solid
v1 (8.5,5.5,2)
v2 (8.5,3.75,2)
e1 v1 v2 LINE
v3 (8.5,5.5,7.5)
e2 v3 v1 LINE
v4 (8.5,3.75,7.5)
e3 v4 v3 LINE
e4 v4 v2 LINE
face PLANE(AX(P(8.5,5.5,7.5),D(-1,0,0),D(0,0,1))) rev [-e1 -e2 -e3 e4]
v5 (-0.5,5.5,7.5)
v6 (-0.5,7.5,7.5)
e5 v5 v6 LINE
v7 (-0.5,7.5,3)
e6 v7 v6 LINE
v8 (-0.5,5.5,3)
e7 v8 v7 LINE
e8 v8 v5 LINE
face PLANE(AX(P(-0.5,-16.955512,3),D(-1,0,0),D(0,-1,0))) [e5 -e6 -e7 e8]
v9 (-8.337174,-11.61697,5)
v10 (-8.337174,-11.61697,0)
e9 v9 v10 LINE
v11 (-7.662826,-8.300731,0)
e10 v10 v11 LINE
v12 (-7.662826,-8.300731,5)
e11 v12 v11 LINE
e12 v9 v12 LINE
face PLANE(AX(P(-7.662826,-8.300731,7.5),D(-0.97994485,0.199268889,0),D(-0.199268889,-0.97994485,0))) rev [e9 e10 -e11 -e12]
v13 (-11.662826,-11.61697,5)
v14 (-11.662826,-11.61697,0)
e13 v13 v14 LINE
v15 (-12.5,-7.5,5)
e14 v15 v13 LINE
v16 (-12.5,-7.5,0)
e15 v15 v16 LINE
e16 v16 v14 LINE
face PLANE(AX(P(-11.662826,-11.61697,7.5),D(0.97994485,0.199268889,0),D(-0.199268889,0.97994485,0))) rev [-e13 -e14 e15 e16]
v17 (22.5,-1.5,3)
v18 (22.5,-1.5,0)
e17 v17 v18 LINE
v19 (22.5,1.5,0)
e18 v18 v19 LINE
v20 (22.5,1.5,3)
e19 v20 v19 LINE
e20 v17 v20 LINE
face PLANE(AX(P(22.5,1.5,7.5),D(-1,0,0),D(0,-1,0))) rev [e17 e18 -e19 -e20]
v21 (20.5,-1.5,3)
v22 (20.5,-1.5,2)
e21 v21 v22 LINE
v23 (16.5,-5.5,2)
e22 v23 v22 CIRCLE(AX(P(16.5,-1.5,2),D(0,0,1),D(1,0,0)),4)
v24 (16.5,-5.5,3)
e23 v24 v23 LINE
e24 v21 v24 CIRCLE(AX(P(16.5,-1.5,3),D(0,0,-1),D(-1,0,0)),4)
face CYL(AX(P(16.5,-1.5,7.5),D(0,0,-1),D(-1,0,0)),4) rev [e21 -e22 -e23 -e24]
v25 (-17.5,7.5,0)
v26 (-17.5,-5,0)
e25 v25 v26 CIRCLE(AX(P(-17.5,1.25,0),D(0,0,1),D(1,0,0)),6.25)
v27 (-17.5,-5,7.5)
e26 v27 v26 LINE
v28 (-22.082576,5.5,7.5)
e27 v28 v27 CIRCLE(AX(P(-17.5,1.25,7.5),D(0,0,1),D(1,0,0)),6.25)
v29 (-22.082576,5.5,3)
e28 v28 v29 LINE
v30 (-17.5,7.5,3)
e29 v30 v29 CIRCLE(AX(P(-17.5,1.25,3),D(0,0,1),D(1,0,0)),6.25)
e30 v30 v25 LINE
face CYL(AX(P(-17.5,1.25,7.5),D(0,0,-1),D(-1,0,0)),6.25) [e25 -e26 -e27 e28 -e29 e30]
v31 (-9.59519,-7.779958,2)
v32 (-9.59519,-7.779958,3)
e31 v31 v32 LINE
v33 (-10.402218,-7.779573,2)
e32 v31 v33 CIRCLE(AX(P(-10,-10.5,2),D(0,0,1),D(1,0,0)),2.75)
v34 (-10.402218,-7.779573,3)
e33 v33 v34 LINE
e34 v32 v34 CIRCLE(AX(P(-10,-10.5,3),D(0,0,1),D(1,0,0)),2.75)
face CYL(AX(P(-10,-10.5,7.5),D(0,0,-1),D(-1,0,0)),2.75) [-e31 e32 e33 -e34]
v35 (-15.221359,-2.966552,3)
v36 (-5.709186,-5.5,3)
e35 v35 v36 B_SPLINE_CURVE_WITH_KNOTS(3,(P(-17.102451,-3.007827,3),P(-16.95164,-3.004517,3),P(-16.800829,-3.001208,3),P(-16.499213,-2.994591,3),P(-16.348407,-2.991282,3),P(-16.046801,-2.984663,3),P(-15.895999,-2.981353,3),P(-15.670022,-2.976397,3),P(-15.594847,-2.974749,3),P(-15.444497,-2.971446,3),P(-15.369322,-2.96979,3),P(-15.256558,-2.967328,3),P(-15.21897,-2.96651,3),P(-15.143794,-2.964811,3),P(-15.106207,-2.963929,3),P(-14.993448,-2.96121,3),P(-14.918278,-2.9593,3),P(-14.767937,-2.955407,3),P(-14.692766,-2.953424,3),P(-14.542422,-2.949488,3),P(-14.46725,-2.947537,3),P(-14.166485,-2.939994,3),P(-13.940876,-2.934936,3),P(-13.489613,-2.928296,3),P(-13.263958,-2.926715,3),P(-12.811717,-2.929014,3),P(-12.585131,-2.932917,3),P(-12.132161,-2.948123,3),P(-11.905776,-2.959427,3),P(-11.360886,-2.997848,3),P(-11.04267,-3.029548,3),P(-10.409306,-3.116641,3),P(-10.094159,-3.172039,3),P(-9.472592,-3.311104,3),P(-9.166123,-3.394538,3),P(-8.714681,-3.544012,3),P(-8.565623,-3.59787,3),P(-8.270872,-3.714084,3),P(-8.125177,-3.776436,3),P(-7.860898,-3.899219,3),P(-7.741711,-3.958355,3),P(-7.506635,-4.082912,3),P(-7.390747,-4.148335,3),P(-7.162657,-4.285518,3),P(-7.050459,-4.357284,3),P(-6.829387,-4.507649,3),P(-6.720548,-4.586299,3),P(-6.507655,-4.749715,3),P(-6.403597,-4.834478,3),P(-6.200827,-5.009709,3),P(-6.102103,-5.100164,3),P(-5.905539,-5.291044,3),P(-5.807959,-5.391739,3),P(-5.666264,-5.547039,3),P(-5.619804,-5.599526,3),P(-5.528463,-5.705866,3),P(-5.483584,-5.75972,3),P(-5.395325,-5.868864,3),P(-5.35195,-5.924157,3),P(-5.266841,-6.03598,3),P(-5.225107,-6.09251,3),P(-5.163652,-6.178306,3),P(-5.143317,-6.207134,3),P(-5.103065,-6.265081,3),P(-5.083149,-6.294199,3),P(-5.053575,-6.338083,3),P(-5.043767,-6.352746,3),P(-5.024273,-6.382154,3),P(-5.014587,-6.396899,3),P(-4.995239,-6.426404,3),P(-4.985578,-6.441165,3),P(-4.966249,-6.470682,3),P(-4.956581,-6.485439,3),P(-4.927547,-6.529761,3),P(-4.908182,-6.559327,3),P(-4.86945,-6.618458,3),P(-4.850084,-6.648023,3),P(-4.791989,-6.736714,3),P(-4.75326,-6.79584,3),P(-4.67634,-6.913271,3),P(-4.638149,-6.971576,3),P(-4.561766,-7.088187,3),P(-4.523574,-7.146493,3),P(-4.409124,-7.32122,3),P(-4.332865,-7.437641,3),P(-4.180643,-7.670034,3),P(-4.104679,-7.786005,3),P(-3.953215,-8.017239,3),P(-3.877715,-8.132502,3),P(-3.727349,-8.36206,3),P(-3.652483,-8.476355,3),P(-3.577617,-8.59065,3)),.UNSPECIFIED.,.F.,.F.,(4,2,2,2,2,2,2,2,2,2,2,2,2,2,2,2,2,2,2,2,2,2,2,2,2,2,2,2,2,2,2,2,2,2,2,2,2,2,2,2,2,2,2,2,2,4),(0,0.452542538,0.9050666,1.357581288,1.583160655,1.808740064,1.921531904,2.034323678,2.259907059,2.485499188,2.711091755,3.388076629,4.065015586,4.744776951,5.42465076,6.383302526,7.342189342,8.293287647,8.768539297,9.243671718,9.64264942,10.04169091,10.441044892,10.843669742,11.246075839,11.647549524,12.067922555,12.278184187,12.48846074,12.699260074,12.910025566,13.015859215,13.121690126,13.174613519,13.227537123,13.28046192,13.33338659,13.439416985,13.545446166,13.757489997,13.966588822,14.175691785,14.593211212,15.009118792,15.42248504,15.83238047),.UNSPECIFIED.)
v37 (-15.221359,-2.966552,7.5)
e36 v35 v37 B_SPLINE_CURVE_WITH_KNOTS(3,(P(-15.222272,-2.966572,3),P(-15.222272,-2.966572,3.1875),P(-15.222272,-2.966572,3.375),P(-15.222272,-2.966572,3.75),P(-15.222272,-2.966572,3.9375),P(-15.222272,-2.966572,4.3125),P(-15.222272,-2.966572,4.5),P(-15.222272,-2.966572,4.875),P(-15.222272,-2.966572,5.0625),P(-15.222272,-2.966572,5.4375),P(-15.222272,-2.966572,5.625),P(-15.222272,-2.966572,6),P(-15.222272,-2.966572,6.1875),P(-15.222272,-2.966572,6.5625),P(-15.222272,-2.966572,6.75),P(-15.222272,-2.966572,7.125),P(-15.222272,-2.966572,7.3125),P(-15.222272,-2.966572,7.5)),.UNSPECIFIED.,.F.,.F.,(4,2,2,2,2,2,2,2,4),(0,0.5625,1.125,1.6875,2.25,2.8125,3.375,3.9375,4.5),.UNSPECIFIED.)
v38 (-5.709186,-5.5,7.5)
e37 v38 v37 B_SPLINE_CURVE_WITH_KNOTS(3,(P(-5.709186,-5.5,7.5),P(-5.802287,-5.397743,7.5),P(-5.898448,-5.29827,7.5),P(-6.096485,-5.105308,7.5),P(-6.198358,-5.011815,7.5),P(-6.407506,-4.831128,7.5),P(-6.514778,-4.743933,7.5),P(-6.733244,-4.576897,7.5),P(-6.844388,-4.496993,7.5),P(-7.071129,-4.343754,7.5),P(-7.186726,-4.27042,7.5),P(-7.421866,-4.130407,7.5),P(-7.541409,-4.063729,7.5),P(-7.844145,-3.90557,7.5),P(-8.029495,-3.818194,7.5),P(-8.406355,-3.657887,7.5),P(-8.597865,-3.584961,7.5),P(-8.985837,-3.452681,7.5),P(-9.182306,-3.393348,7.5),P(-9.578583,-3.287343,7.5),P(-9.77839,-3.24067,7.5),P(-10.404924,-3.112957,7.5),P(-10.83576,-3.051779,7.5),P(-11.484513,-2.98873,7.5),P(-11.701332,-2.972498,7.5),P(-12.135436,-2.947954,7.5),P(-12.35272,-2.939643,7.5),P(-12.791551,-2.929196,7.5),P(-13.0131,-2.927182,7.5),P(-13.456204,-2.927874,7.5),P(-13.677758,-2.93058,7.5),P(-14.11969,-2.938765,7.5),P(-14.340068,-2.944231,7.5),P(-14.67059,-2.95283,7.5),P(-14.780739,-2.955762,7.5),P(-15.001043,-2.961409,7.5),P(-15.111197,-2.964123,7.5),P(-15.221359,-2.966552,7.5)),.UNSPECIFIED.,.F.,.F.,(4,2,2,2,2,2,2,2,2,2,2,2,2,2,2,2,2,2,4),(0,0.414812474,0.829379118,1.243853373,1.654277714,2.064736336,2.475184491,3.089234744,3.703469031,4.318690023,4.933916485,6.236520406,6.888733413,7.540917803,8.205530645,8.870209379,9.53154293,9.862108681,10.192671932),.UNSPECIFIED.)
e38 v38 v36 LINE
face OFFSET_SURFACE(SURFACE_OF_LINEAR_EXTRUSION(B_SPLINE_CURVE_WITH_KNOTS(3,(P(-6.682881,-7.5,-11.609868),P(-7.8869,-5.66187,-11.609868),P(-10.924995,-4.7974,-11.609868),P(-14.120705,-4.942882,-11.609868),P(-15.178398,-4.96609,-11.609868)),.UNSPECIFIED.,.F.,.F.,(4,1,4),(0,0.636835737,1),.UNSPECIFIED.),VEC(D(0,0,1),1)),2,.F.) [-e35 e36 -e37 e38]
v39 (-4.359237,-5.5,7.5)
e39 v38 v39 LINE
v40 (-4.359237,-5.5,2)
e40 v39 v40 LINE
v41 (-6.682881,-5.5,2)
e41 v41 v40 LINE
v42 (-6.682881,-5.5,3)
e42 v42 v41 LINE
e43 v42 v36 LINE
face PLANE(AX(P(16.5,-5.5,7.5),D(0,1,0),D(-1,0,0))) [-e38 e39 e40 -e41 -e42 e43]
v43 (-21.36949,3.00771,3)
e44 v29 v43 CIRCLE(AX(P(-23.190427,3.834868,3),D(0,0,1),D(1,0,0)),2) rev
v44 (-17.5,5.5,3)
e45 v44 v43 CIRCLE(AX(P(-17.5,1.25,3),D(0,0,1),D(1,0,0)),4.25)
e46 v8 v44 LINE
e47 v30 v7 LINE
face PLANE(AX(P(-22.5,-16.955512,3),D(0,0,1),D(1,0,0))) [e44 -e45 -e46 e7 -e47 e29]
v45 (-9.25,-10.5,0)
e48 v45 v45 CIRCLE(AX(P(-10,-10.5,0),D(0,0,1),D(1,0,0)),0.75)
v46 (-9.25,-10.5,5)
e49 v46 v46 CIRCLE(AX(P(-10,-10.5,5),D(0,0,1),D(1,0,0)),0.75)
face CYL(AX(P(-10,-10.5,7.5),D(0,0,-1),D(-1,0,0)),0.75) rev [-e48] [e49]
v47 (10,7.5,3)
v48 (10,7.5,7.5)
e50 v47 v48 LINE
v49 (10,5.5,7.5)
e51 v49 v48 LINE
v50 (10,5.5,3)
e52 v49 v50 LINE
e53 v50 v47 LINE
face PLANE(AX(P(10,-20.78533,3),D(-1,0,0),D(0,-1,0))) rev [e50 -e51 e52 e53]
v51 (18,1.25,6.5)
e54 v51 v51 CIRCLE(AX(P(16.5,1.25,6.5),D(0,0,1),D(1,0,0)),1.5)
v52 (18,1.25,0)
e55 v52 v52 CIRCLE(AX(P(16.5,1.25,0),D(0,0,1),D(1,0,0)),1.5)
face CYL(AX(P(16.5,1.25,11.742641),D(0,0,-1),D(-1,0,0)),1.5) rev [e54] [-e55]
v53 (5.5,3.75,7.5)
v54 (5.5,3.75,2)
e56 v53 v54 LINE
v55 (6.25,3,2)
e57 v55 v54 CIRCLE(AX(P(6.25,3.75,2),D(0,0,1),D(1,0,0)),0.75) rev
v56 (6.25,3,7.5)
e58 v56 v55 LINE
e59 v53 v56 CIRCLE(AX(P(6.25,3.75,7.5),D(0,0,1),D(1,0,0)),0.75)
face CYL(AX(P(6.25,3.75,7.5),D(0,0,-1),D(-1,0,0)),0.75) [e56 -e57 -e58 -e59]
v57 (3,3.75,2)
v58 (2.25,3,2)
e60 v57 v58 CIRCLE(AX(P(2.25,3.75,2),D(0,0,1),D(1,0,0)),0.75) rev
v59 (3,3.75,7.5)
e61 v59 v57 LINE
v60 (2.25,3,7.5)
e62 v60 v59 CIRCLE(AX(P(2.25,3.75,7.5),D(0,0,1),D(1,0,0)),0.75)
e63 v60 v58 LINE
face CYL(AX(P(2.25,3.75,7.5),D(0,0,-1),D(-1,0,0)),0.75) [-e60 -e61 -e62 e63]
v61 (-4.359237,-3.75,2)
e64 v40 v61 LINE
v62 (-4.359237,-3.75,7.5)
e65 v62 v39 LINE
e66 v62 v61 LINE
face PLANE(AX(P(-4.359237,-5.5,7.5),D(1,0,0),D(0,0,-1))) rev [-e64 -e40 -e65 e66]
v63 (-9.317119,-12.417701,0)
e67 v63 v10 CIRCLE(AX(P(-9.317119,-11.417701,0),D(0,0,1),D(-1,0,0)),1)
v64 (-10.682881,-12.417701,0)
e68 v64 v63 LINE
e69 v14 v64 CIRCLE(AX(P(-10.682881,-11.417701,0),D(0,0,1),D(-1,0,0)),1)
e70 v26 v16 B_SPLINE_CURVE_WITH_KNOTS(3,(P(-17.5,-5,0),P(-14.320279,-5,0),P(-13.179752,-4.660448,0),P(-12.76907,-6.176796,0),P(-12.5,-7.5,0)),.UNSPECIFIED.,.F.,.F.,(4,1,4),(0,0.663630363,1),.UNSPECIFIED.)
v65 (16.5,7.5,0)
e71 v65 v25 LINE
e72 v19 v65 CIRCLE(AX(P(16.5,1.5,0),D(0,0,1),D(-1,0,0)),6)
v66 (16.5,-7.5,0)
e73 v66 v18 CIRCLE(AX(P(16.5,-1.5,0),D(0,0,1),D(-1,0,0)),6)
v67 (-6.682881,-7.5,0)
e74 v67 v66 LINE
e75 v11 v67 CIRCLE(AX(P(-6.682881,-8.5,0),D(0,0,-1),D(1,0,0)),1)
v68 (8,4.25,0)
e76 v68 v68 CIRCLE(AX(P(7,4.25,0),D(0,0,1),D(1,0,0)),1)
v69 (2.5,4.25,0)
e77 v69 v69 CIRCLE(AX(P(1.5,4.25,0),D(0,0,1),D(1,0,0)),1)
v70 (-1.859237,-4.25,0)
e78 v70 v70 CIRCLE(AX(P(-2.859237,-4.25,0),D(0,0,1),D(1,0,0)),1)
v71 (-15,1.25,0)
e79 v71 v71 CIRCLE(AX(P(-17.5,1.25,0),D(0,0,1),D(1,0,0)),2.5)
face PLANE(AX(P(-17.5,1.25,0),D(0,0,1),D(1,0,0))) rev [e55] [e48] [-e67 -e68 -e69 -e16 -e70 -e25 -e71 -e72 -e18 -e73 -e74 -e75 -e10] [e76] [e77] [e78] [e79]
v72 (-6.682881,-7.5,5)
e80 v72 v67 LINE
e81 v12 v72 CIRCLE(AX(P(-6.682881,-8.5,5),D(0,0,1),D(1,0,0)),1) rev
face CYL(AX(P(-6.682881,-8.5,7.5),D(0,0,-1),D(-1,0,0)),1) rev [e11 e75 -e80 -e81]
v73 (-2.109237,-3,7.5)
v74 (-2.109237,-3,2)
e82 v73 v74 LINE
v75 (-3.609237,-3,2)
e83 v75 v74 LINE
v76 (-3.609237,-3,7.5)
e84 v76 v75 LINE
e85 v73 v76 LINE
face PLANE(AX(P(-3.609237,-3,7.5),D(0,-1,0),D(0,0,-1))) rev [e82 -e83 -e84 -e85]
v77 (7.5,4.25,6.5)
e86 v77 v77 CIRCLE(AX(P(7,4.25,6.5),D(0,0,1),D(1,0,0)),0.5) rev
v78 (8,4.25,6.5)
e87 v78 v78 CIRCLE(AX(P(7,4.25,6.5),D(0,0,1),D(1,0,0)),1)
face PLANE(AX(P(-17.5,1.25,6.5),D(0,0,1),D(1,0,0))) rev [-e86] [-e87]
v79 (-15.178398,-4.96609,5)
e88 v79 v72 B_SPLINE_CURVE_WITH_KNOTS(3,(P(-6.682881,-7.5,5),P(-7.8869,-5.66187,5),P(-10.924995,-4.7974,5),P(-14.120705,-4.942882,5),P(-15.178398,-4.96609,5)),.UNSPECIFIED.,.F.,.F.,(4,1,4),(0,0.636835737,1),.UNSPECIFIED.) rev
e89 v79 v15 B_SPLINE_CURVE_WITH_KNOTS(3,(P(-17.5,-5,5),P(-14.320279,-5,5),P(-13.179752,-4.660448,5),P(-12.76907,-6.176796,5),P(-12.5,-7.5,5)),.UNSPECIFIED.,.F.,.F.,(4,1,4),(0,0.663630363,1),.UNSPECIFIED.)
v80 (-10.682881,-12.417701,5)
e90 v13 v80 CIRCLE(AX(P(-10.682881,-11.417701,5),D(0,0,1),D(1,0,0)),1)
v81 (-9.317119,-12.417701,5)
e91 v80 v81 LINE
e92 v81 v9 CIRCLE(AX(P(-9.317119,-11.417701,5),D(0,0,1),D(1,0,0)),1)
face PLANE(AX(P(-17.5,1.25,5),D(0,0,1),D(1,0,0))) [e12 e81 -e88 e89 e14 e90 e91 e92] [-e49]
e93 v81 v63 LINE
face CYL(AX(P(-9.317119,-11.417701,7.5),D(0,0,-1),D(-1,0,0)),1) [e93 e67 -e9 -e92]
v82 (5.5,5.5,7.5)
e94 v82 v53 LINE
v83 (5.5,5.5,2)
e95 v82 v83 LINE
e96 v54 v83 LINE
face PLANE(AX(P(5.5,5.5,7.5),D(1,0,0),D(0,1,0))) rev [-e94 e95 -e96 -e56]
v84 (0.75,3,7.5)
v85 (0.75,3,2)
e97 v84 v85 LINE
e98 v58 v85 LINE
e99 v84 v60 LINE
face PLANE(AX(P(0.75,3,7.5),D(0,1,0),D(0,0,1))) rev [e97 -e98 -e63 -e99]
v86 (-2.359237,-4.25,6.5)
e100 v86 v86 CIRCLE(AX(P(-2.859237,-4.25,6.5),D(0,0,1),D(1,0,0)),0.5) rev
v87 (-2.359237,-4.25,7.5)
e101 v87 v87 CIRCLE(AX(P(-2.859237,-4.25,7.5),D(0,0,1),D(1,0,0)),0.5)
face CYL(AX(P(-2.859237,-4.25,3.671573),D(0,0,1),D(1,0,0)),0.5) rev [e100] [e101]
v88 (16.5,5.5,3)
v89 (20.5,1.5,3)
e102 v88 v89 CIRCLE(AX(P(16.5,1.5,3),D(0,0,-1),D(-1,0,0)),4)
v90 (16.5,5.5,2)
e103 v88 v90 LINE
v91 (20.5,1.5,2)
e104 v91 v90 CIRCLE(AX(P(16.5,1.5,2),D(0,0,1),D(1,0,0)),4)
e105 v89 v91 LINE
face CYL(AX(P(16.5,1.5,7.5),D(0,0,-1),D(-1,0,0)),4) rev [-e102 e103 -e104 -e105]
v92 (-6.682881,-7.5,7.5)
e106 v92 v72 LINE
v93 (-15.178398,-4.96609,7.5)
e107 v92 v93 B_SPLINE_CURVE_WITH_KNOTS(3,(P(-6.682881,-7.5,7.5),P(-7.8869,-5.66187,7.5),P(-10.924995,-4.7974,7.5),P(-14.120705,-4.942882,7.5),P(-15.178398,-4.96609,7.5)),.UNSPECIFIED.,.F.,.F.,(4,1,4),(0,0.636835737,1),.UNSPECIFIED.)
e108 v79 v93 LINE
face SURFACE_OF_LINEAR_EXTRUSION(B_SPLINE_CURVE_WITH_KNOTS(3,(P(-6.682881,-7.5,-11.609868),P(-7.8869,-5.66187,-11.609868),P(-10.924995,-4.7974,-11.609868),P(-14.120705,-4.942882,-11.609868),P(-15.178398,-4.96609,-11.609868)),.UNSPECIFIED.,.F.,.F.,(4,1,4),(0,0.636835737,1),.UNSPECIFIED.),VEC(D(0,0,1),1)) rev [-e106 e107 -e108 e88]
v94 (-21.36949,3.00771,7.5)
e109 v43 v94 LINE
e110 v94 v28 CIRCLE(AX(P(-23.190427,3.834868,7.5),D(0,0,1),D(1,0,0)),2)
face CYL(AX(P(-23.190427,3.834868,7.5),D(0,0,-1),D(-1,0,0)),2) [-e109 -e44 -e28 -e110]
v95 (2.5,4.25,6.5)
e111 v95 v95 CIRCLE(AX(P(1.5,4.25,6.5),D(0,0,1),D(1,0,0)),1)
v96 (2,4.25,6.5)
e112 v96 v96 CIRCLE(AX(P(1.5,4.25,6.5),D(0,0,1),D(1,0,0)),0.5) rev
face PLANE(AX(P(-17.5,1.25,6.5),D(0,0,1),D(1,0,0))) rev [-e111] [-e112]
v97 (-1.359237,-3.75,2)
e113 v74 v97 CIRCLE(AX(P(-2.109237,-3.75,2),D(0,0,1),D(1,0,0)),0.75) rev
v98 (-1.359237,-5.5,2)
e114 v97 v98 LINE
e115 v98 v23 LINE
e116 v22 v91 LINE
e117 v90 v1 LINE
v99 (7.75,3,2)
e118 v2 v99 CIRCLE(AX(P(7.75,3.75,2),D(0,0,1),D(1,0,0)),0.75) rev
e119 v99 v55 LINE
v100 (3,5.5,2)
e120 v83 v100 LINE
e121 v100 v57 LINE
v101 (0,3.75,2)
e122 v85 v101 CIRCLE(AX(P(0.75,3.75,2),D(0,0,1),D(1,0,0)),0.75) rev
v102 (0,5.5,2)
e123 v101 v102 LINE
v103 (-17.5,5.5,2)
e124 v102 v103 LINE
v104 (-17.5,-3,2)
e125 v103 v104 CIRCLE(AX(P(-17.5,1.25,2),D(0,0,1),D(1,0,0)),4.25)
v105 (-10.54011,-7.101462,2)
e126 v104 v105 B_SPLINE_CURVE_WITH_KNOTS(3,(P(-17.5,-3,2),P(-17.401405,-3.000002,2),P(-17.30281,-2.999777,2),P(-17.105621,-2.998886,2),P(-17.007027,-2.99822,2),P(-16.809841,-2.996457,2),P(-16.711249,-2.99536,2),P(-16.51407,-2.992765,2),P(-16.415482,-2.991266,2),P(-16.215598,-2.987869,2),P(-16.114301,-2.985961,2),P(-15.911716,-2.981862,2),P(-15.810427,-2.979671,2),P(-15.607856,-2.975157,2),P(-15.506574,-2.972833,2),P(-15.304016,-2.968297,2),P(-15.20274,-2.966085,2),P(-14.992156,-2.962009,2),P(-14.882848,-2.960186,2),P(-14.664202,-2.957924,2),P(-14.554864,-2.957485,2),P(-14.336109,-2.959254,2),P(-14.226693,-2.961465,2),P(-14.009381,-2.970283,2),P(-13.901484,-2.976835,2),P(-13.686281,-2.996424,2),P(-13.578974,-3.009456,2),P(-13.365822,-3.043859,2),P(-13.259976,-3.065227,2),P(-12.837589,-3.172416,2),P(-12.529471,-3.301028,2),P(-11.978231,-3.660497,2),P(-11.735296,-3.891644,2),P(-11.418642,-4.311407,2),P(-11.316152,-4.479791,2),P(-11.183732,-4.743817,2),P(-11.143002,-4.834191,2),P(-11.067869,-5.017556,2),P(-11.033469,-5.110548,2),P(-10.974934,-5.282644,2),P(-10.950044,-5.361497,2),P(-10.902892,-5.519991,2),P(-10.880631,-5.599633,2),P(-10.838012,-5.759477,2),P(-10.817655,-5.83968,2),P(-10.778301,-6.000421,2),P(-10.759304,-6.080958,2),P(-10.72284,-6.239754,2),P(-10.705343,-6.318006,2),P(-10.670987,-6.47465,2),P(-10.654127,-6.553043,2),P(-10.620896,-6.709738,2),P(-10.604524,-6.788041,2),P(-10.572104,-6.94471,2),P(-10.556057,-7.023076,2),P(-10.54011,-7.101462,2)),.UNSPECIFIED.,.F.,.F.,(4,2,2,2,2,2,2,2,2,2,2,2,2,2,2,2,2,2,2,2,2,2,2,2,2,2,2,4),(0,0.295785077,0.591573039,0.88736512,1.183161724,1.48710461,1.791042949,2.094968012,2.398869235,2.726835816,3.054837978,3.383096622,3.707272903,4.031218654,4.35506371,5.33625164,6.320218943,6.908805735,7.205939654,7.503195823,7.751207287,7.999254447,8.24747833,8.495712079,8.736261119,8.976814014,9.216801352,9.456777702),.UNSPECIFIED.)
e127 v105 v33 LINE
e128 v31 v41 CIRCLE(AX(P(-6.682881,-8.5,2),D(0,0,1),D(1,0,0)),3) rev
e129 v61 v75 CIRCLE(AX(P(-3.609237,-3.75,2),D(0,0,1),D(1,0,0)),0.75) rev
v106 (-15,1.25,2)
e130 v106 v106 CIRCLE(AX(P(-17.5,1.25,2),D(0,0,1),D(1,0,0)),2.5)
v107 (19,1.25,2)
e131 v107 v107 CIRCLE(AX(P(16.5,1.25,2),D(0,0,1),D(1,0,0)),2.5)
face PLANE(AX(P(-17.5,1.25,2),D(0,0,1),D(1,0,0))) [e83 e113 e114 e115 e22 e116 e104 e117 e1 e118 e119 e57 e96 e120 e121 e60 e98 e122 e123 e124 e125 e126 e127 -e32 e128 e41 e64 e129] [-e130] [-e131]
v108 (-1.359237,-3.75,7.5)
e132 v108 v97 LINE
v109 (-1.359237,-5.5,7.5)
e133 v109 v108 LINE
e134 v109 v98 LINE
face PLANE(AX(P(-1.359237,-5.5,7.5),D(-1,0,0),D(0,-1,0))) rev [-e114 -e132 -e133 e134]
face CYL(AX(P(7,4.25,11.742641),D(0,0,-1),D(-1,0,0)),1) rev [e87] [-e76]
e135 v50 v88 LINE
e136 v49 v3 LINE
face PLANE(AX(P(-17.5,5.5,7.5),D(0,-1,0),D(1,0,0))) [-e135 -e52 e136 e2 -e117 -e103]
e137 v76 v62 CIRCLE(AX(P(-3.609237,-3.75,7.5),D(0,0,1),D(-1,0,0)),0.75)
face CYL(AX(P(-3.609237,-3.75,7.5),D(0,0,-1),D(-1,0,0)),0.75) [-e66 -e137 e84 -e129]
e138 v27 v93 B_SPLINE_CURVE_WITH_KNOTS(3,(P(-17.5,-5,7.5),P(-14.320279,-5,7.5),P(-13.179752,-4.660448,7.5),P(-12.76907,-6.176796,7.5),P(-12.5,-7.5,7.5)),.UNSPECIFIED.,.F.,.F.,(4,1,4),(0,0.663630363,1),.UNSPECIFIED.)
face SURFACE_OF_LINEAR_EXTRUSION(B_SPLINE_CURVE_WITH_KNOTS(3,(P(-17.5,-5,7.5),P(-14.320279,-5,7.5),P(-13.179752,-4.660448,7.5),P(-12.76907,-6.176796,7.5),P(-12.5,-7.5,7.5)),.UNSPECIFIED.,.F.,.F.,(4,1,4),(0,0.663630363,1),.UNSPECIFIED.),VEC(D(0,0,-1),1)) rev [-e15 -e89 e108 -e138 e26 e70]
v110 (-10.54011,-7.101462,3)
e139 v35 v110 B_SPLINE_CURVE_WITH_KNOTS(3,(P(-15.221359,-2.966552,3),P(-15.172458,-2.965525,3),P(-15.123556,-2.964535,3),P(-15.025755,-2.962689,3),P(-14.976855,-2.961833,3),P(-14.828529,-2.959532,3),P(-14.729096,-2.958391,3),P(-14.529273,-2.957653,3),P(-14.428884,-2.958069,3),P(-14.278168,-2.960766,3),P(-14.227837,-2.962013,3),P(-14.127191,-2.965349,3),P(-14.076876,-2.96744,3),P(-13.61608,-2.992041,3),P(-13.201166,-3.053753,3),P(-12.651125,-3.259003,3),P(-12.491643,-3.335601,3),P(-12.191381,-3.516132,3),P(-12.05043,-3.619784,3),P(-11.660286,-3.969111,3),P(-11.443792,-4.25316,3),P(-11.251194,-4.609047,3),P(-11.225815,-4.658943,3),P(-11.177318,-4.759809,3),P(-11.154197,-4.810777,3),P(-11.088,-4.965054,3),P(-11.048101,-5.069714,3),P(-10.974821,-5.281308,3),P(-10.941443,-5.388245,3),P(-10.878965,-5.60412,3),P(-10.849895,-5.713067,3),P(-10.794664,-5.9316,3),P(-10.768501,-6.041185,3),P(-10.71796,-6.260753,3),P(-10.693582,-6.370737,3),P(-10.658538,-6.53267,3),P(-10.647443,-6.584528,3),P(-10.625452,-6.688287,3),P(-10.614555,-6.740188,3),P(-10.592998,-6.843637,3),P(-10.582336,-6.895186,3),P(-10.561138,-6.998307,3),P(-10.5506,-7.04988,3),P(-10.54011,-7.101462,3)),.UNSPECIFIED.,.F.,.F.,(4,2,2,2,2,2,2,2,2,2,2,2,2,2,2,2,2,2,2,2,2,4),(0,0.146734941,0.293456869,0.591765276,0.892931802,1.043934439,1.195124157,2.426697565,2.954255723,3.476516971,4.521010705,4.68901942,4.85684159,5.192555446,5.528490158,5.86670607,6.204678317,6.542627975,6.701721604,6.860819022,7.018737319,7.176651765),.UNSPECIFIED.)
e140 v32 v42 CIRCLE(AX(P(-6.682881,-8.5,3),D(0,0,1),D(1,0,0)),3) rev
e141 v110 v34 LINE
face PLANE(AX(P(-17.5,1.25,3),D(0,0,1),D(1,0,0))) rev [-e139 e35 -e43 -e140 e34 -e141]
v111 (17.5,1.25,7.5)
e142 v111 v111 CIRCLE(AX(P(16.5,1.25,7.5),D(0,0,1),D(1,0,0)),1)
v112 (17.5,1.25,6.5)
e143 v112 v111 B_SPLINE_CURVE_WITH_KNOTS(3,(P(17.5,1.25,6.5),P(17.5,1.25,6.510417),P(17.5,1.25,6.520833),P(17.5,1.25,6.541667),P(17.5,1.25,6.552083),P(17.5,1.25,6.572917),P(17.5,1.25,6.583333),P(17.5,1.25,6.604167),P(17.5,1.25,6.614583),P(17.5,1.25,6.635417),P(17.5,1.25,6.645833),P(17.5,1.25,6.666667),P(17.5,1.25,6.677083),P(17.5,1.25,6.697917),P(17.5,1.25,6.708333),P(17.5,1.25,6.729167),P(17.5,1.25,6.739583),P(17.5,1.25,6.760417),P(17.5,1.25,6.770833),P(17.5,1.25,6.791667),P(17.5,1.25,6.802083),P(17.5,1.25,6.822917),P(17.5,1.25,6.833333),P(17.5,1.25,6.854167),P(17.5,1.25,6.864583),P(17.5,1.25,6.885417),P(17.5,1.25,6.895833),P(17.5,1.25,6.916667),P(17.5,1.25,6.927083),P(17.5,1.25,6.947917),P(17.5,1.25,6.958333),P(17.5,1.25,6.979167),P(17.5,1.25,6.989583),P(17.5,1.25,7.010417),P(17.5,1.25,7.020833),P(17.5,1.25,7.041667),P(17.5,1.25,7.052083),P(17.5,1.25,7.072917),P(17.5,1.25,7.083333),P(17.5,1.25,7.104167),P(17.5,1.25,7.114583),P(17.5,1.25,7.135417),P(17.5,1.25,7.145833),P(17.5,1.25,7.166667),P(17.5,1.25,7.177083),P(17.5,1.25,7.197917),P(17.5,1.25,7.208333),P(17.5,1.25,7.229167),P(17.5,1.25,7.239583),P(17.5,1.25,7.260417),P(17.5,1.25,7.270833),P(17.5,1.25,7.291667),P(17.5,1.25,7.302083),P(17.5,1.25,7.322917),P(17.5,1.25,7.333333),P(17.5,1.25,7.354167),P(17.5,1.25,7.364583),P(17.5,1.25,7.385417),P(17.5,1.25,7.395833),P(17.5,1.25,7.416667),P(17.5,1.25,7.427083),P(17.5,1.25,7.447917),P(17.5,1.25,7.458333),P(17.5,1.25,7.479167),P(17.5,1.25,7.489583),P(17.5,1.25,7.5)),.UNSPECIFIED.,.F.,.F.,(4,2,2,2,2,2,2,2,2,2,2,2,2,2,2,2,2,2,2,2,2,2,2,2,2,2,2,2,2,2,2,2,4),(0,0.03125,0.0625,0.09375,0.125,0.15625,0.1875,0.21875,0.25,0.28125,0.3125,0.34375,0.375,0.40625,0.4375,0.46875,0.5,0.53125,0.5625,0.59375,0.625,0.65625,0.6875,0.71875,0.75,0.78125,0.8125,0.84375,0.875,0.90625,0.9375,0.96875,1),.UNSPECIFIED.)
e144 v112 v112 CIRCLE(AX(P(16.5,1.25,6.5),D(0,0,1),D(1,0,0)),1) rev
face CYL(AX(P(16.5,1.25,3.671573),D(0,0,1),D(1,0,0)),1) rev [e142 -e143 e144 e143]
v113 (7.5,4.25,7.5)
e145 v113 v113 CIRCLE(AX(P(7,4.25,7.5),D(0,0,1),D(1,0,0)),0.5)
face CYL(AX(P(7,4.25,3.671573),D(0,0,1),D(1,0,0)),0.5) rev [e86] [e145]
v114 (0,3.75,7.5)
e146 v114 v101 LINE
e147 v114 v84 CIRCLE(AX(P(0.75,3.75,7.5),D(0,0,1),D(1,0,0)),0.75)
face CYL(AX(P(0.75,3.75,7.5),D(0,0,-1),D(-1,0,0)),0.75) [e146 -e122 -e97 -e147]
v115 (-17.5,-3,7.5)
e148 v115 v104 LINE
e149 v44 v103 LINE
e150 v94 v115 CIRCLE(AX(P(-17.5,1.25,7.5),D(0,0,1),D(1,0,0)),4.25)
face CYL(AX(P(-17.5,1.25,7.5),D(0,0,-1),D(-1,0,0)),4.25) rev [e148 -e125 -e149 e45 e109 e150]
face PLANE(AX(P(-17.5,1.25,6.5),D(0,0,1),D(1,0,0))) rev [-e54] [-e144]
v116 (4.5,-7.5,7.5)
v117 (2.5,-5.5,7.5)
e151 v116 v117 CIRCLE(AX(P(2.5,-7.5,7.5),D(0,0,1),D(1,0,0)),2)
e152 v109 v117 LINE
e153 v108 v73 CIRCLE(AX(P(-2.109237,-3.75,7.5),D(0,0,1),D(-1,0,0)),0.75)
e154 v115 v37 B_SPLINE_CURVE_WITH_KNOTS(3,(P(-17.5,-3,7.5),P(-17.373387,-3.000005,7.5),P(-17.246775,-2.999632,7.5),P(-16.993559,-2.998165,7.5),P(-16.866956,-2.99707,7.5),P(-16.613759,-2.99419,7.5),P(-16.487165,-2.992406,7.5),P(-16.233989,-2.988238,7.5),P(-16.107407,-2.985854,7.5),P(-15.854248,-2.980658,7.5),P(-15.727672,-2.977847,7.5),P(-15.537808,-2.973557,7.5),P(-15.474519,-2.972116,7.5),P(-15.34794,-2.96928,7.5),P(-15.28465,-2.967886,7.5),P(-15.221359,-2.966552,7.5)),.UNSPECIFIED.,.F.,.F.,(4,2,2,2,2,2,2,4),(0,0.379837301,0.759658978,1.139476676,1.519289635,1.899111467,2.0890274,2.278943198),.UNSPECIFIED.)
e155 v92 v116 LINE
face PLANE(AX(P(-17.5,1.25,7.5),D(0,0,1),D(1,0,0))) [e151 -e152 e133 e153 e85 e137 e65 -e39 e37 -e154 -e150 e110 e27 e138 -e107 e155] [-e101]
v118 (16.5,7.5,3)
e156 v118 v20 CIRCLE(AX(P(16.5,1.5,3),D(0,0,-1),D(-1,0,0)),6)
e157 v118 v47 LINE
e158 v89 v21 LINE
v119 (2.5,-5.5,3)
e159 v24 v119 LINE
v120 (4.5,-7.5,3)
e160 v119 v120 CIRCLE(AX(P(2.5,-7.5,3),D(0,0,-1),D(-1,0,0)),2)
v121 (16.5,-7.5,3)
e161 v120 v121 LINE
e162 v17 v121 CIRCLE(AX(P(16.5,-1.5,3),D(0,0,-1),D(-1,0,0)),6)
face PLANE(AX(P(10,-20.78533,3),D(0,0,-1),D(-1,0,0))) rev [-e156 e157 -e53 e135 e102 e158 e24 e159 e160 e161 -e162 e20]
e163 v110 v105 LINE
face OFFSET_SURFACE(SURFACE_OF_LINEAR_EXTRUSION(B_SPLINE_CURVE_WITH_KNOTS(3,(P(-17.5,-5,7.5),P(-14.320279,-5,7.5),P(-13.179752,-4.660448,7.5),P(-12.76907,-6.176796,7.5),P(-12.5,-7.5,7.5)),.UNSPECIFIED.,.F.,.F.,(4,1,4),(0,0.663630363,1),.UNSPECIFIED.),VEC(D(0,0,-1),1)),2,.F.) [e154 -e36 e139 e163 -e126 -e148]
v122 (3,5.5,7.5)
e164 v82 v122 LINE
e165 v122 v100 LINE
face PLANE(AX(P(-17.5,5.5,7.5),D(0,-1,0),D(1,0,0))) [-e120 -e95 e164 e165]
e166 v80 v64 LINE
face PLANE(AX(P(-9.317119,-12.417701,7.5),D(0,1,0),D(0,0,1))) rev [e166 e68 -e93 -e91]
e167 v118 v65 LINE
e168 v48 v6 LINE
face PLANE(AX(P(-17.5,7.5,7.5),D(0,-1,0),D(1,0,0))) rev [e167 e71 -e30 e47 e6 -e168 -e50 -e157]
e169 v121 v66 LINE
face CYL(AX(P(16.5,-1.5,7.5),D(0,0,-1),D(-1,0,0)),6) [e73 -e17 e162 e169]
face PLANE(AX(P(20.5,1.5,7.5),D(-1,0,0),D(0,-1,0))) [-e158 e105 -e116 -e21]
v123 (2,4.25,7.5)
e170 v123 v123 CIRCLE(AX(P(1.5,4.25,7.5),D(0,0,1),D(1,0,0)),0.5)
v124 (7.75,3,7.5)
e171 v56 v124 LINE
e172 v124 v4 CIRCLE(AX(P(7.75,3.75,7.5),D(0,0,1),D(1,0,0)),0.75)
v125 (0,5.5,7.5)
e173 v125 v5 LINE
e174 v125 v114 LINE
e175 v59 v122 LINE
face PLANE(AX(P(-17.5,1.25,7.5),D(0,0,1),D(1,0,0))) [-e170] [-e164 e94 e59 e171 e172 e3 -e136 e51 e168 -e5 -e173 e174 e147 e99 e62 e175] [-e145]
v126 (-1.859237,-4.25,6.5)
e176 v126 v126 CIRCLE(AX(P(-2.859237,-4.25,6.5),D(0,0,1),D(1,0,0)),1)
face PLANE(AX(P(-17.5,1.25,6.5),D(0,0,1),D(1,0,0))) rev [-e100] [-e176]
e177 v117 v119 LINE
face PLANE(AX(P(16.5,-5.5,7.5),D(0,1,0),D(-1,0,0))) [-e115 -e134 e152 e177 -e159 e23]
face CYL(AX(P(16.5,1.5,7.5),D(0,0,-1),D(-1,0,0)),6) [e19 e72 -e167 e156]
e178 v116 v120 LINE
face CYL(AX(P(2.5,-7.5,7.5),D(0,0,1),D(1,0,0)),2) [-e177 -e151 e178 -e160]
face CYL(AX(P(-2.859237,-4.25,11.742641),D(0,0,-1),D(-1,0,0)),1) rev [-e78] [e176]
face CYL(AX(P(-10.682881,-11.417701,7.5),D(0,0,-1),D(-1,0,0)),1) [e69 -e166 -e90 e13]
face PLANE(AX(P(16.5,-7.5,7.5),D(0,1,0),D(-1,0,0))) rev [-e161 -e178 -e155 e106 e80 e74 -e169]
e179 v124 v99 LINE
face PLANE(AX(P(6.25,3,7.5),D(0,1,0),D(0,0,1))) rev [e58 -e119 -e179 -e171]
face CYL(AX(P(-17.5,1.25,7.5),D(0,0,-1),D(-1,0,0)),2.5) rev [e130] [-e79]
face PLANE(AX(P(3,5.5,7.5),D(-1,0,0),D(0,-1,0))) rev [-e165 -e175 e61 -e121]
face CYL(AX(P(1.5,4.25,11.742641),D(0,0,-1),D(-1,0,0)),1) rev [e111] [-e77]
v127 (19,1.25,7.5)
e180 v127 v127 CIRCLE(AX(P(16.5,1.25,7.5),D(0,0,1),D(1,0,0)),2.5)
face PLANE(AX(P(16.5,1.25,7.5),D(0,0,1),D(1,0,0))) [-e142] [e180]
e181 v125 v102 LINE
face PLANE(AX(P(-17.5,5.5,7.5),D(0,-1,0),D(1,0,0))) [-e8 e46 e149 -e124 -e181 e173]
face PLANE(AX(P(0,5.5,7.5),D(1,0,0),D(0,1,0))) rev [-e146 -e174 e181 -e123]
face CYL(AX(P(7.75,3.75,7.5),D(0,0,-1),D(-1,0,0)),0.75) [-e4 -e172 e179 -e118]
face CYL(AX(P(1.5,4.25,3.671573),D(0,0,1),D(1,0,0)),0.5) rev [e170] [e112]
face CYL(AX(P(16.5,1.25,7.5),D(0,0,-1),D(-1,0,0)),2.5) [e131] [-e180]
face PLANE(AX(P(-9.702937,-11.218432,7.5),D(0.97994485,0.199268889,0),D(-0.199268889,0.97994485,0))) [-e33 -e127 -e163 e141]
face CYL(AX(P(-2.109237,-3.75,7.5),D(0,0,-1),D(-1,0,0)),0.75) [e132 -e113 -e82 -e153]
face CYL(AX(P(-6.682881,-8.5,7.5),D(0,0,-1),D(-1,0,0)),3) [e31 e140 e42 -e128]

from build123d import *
from OCP.BRepAlgoAPI import BRepAlgoAPI_Cut
from OCP.TopTools import TopTools_ListOfShape

# Parameters (mm, degrees)
SKETCH1_R           = 0.75
SKETCH1_R_2         = 2.5
BOSS_EXTRUDE1_DEPTH = 7.5
CUT_EXTRUDE1_DEPTH  = 2.5
SHELL5_START        = 2
SHELL5_OUTLINE_R    = 2.5
SHELL5_DEPTH        = 5.5
SHELL5_2_DEPTH      = 1
CUT_EXTRUDE2_REACH  = 33.891
SKETCH3_W           = 12.5
SKETCH3_H           = 4.5
SKETCH4_W           = 22
SKETCH4_H           = 4.5
CUT_EXTRUDE3_DEPTH  = 2
SKETCH5_R           = 2.5
BOSS_EXTRUDE2_DEPTH = 7.5
SKETCH6_W           = 5.5
SKETCH6_H           = 4.5
CUT_EXTRUDE4_DEPTH  = 2
BOSS_EXTRUDE3_DEPTH = 7.5
SKETCH8_R           = 1
SKETCH8_R_2         = 1.5
CUT_EXTRUDE5_DEPTH  = 6.5
SKETCH9_R           = 1
SKETCH9_R_2         = 0.5
CUT_EXTRUDE6_DEPTH  = 1
FILLET1_R           = 2


with BuildPart() as part:
    # Sketch1 → Boss-Extrude1 (new body)
    with BuildSketch(Plane.XY):
        with BuildLine():
            Line((-17.5, 7.5), (16.5, 7.5))
            ThreePointArc((16.5, 7.5), (20.742640687, 5.742640687), (22.5, 1.5))
            Line((22.5, 1.5), (22.5, -1.5))
            ThreePointArc((22.5, -1.5), (20.742640687, -5.742640687), (16.5, -7.5))
            Line((16.5, -7.5), (-6.682881455, -7.5))
            ThreePointArc((-6.682881455, -7.5), (-7.315625918, -7.725639332), (-7.662826305, -8.300731111))
            Line((-7.662826305, -8.300731111), (-8.337173695, -11.61697006))
            ThreePointArc((-8.337173695, -11.61697006), (-8.684374082, -12.192061839), (-9.317118545, -12.41770117))
            Line((-9.317118545, -12.41770117), (-10.682881455, -12.41770117))
            ThreePointArc((-10.682881455, -12.41770117), (-11.315625918, -12.192061839), (-11.662826305, -11.61697006))
            Line((-11.662826305, -11.61697006), (-12.5, -7.5))
            add(Edge.make_bspline(
                [(-17.5, -5), (-14.320279304, -5), (-13.179751961, -4.660447797), (-12.769069707, -6.176795589), (-12.5, -7.5)],
                knots=[0, 0, 0, 0, 0.663630363, 1, 1, 1, 1], degree=3))
            ThreePointArc((-17.5, -5), (-23.75, 1.25), (-17.5, 7.5))
        make_face()
        with Locations((-10, -10.5)):
            Circle(SKETCH1_R, mode=Mode.SUBTRACT)
        with Locations((-17.5, 1.25)):
            Circle(SKETCH1_R_2, mode=Mode.SUBTRACT)
        with Locations((16.5, 1.25)):
            Circle(SKETCH1_R_2, mode=Mode.SUBTRACT)
    extrude(amount=BOSS_EXTRUDE1_DEPTH)

    # Sketch2 → Cut-Extrude1 (cut)
    with BuildSketch(Plane.XY.offset(7.5)):
        with BuildLine():
            Line((-15.178398269, -4.966090348), (-15.008472623, -12.710378991))
            Line((-15.008472623, -12.710378991), (-6.851113055, -12.710378991))
            Line((-6.851113055, -12.710378991), (-6.682881455, -7.5))
            add(Edge.make_bspline(
                [(-15.178398269, -4.966090348), (-14.120705321, -4.942882386), (-10.924994513, -4.797400334), (-7.886900282, -5.661870268), (-6.682881455, -7.5)],
                knots=[0, 0, 0, 0, 0.363164263, 1, 1, 1, 1], degree=3))
        make_face()
    extrude(amount=-CUT_EXTRUDE1_DEPTH, mode=Mode.SUBTRACT)


with BuildPart() as shell5_tool:
    # Shell5: read off the stored shape, not the designer's step
    # Shell5 outline → Shell5 (new body)
    with BuildSketch(Plane.XY.offset(SHELL5_START)):
        with BuildLine():
            ThreePointArc((-17.5, 5.5), (-21.75, 1.25), (-17.5, -3))
            add(Edge.make_bspline(
                [(-17.5, -3), (-17.279470214, -3), (-17.067607137, -2.999191358), (-16.864129639, -2.997686938), (-16.668767846, -2.99557937), (-16.481223243, -2.992977326), (-16.301191194, -2.989985538), (-16.128356468, -2.986704319), (-15.96238705, -2.98323319), (-15.802930702, -2.979672128), (-15.649611814, -2.976121667), (-15.502027076, -2.972683494), (-15.359739594, -2.96946243), (-15.22227185, -2.966570646)],
                knots=[0, 0, 0, 0, 0, 0, 0, 0, 0, 0, 0, 0, 0, 0, 0.205554911, 0.205554911, 0.205554911, 0.205554911, 0.205554911, 0.205554911, 0.205554911, 0.205554911, 0.205554911, 0.205554911, 0.205554911, 0.205554911, 0.205554911, 0.205554911], degree=13))
            add(Edge.make_bspline(
                [(-5.709186534, -5.500000403), (-6.306803382, -4.843784547), (-6.973897736, -4.291392484), (-7.693172142, -3.84840516), (-8.440659076, -3.51480441), (-9.190928646, -3.278430045), (-9.929269581, -3.113132637), (-10.666123962, -3.002227883), (-11.382986557, -2.942110529), (-12.089726768, -2.909817875), (-12.774471769, -2.906571366), (-13.437022906, -2.916899663), (-14.070436809, -2.935750402), (-14.668490575, -2.954420526), (-15.22227185, -2.966570646)],
                knots=[0.082765311, 0.082765311, 0.082765311, 0.082765311, 0.082765311, 0.082765311, 0.082765311, 0.082765311, 0.082765311, 0.082765311, 0.082765311, 0.082765311, 0.082765311, 0.082765311, 0.082765311, 1, 1, 1, 1, 1, 1, 1, 1, 1, 1, 1, 1, 1, 1, 1], degree=14))
            Line((-5.709186534, -5.500000403), (16.5, -5.5))
            ThreePointArc((16.5, -5.5), (19.328427125, -4.328427125), (20.5, -1.5))
            Line((20.5, -1.5), (20.5, 1.5))
            ThreePointArc((20.5, 1.5), (19.328427125, 4.328427125), (16.5, 5.5))
            Line((16.5, 5.5), (-17.5, 5.5))
        make_face()
        with Locations((-17.5, 1.25)):
            Circle(SHELL5_OUTLINE_R, mode=Mode.SUBTRACT)
        with Locations((16.5, 1.25)):
            Circle(SHELL5_OUTLINE_R, mode=Mode.SUBTRACT)
    extrude(amount=SHELL5_DEPTH)


with BuildPart() as part_1:
    add(part.part)

    # Shell5: cut by shell5_tool, with a tolerance
    shell5_stock = TopTools_ListOfShape()
    shell5_stock.Append(part_1.part.wrapped)
    shell5_tools = TopTools_ListOfShape()
    shell5_tools.Append(shell5_tool.part.wrapped)
    shell5_cut = BRepAlgoAPI_Cut()
    shell5_cut.SetArguments(shell5_stock)
    shell5_cut.SetTools(shell5_tools)
    shell5_cut.SetFuzzyValue(0.00001)
    shell5_cut.Build()
    add(Compound.cast(shell5_cut.Shape()).solids(), mode=Mode.REPLACE)


with BuildPart() as shell5_2_tool:
    # Shell5 2 outline → Shell5 2 (new body)
    with BuildSketch(Plane.XY.offset(SHELL5_START)):
        with BuildLine():
            add(Edge.make_bspline(
                [(-5.709186534, -5.500000403), (-6.306803382, -4.843784547), (-6.973897736, -4.291392484), (-7.693172142, -3.84840516), (-8.440659076, -3.51480441), (-9.190928646, -3.278430045), (-9.929269581, -3.113132637), (-10.666123962, -3.002227883), (-11.382986557, -2.942110529), (-12.089726768, -2.909817875), (-12.774471769, -2.906571366), (-13.437022906, -2.916899663), (-14.070436809, -2.935750402), (-14.668490575, -2.954420526), (-15.222271829, -2.966571628)],
                knots=[0.082765311, 0.082765311, 0.082765311, 0.082765311, 0.082765311, 0.082765311, 0.082765311, 0.082765311, 0.082765311, 0.082765311, 0.082765311, 0.082765311, 0.082765311, 0.082765311, 0.082765311, 1, 1, 1, 1, 1, 1, 1, 1, 1, 1, 1, 1, 1, 1, 1], degree=14))
            add(Edge.make_bspline(
                [(-15.222271829, -2.966571628), (-15.025357547, -2.962428338), (-14.83833279, -2.958961675), (-14.659794059, -2.956500348), (-14.488166809, -2.955404994), (-14.32166304, -2.956092632), (-14.15822898, -2.959081459), (-13.995488053, -2.965065745), (-13.830698575, -2.975031445), (-13.660752866, -2.990442743), (-13.48223072, -3.013640023), (-13.291856783, -3.048642759), (-13.089831496, -3.100937727), (-12.79104703, -3.205401917), (-12.700612898, -3.240326167), (-12.609092173, -3.279337505), (-12.516899457, -3.322674537), (-12.424583038, -3.370502546), (-12.332814819, -3.422867542), (-12.24235113, -3.479652273), (-12.153972725, -3.540554472), (-12.068414586, -3.605097454), (-11.986298452, -3.672673003), (-11.908083343, -3.742606279), (-11.83405162, -3.814222323), (-11.746925171, -3.905048863), (-11.729770648, -3.923279746), (-11.712888869, -3.941565965), (-11.696281313, -3.959897594), (-11.67994896, -3.978265019), (-11.663892291, -3.996658941), (-11.648111291, -4.015070369), (-11.632605445, -4.033490627), (-11.617373739, -4.051911353), (-11.602414662, -4.070324495), (-11.587726204, -4.088722314), (-11.573305857, -4.107097384), (-11.555611804, -4.130028893), (-11.552090335, -4.134612303), (-11.548583926, -4.139195778), (-11.545093818, -4.143777452), (-11.541621201, -4.14835553), (-11.538165937, -4.152930033), (-11.53472685, -4.157502402), (-11.531302807, -4.162074018), (-11.527893837, -4.166644675), (-11.524501528, -4.171212034), (-11.521127942, -4.175773102), (-11.517772295, -4.180328785), (-11.511076972, -4.189456261), (-11.507738296, -4.194026753), (-11.504408683, -4.198603868), (-11.50108821, -4.203187476), (-11.497776954, -4.207777444), (-11.494474993, -4.212373643), (-11.491182403, -4.216975942), (-11.487899261, -4.22158421), (-11.484625646, -4.226198316), (-11.481361632, -4.23081813), (-11.478107299, -4.23544352), (-11.474862722, -4.240074356), (-11.465158493, -4.25398281), (-11.458728267, -4.263276396), (-11.45233783, -4.272590223), (-11.445987678, -4.28192326), (-11.439678274, -4.291274495), (-11.433410047, -4.300642925), (-11.427183393, -4.310027565), (-11.420998674, -4.319427443), (-11.414856219, -4.328841601), (-11.408756324, -4.338269094), (-11.402699251, -4.347708993), (-11.396685229, -4.357160382), (-11.36683135, -4.404470274), (-11.34364027, -4.442488929), (-11.321153981, -4.480619234), (-11.299376993, -4.518808994), (-11.278306459, -4.557012823), (-11.257933085, -4.595192075), (-11.238242039, -4.633314757), (-11.219213849, -4.671355451), (-11.200825322, -4.709295239), (-11.183050439, -4.747121618), (-11.165861271, -4.784828422), (-11.149228878, -4.822415746), (-11.068705603, -5.009786324), (-11.012727418, -5.157860709), (-10.963295043, -5.304390346), (-10.918354242, -5.451002576), (-10.876276421, -5.599861249), (-10.835871925, -5.753181253), (-10.796238753, -5.913010135), (-10.75663953, -6.081186972), (-10.71645131, -6.2593826), (-10.675150687, -6.44914195), (-10.632280916, -6.651888726), (-10.587398117, -6.868914865), (-10.540110299, -7.101462221)],
                knots=[0.205554911, 0.205554911, 0.205554911, 0.205554911, 0.205554911, 0.205554911, 0.205554911, 0.205554911, 0.205554911, 0.205554911, 0.205554911, 0.205554911, 0.205554911, 0.205554911, 0.5, 0.5, 0.5, 0.5, 0.5, 0.5, 0.5, 0.5, 0.5, 0.5, 0.5, 0.5, 0.625, 0.625, 0.625, 0.625, 0.625, 0.625, 0.625, 0.625, 0.625, 0.625, 0.625, 0.625, 0.65625, 0.65625, 0.65625, 0.65625, 0.65625, 0.65625, 0.65625, 0.65625, 0.65625, 0.65625, 0.65625, 0.65625, 0.6640625, 0.6640625, 0.6640625, 0.6640625, 0.6640625, 0.6640625, 0.6640625, 0.6640625, 0.6640625, 0.6640625, 0.6640625, 0.6640625, 0.671875, 0.671875, 0.671875, 0.671875, 0.671875, 0.671875, 0.671875, 0.671875, 0.671875, 0.671875, 0.671875, 0.671875, 0.6875, 0.6875, 0.6875, 0.6875, 0.6875, 0.6875, 0.6875, 0.6875, 0.6875, 0.6875, 0.6875, 0.6875, 0.75, 0.75, 0.75, 0.75, 0.75, 0.75, 0.75, 0.75, 0.75, 0.75, 0.75, 0.75, 1, 1, 1, 1, 1, 1, 1, 1, 1, 1, 1, 1, 1, 1], degree=13))
            Line((-10.540110299, -7.101462221), (-10.402218376, -7.779573493))
            ThreePointArc((-10.402218376, -7.779573493), (-9.998689871, -7.750000312), (-9.595189727, -7.77995797))
            ThreePointArc((-9.595189727, -7.77995797), (-8.53218861, -6.137784293), (-6.682881455, -5.5))
            Line((-6.682881455, -5.5), (-5.709186534, -5.500000403))
        make_face()
    extrude(amount=SHELL5_2_DEPTH)


with BuildPart() as part_2:
    add(part_1.part)

    # Shell5 2: cut by shell5_2_tool, with a tolerance
    shell5_2_stock = TopTools_ListOfShape()
    shell5_2_stock.Append(part_2.part.wrapped)
    shell5_2_tools = TopTools_ListOfShape()
    shell5_2_tools.Append(shell5_2_tool.part.wrapped)
    shell5_2_cut = BRepAlgoAPI_Cut()
    shell5_2_cut.SetArguments(shell5_2_stock)
    shell5_2_cut.SetTools(shell5_2_tools)
    shell5_2_cut.SetFuzzyValue(0.00001)
    shell5_2_cut.Build()
    add(Compound.cast(shell5_2_cut.Shape()).solids(), mode=Mode.REPLACE)

    # Cut-Extrude2: up to this face of the body (flat: up to its plane)
    cut_extrude2_end = Plane(part_2.part.faces().sort_by_distance((4.908559273, -7.5, 3.75))[0])
    # Sketch3 → Cut-Extrude2 (cut, up to the picked face)
    with BuildSketch(Plane(origin=(0, 7.5, 0), x_dir=(1, 0, 0), z_dir=(0, 1, 0)), mode=Mode.PRIVATE) as cut_extrude2_sk1:
        with Locations((16.25, -5.25)):
            Rectangle(SKETCH3_W, SKETCH3_H)
    cut_extrude2_tool1 = split(extrude(cut_extrude2_sk1.sketch, amount=-CUT_EXTRUDE2_REACH, mode=Mode.PRIVATE), bisect_by=cut_extrude2_end, keep=Keep.BOTH, mode=Mode.PRIVATE)
    add(cut_extrude2_tool1.solids().sort_by(Axis((16.25, 7.5, 5.25), (0, -1, 0)))[0], mode=Mode.SUBTRACT)

    # Sketch4 → Cut-Extrude3 (cut)
    with BuildSketch(Plane(origin=(0, 7.5, 0), x_dir=(1, 0, 0), z_dir=(0, 1, 0))):
        with Locations((-11.5, -5.25)):
            Rectangle(SKETCH4_W, SKETCH4_H)
    extrude(amount=-CUT_EXTRUDE3_DEPTH, mode=Mode.SUBTRACT)

    # Sketch5 → Boss-Extrude2 (add)
    with BuildSketch(Plane.XY):
        with Locations((16.5, 1.25)):
            Circle(SKETCH5_R)
    extrude(amount=BOSS_EXTRUDE2_DEPTH)

    # Sketch6 → Cut-Extrude4 (cut)
    with BuildSketch(Plane.XZ.offset(7.5)):
        with Locations((7.25, 5.25)):
            Rectangle(SKETCH6_W, SKETCH6_H)
    extrude(amount=-CUT_EXTRUDE4_DEPTH, mode=Mode.SUBTRACT)


with BuildPart() as boss_extrude3_tool:
    # Sketch7 → Boss-Extrude3 (new body)
    with BuildSketch(Plane.XY):
        with BuildLine():
            Line((0, 5.5), (3, 5.5))
            Line((3, 5.5), (3, 3.75))
            ThreePointArc((3, 3.75), (2.780330086, 3.219669914), (2.25, 3))
            Line((2.25, 3), (0.75, 3))
            ThreePointArc((0.75, 3), (0.219669914, 3.219669914), (0, 3.75))
            Line((0, 3.75), (0, 5.5))
        make_face()
        with BuildLine():
            Line((-4.359237177, -5.5), (-1.359237177, -5.5))
            Line((-1.359237177, -5.5), (-1.359237177, -3.75))
            ThreePointArc((-1.359237177, -3.75), (-1.578907091, -3.219669914), (-2.109237177, -3))
            Line((-2.109237177, -3), (-3.609237177, -3))
            ThreePointArc((-3.609237177, -3), (-4.139567263, -3.219669914), (-4.359237177, -3.75))
            Line((-4.359237177, -3.75), (-4.359237177, -5.5))
        make_face()
        with BuildLine():
            Line((5.5, 5.5), (8.5, 5.5))
            Line((8.5, 5.5), (8.5, 3.75))
            ThreePointArc((8.5, 3.75), (8.280330086, 3.219669914), (7.75, 3))
            Line((7.75, 3), (6.25, 3))
            ThreePointArc((6.25, 3), (5.719669914, 3.219669914), (5.5, 3.75))
            Line((5.5, 3.75), (5.5, 5.5))
        make_face()
    extrude(amount=BOSS_EXTRUDE3_DEPTH)


with BuildPart() as part_3:
    add(part_2.part)


with BuildPart() as part_4:
    # Boss-Extrude3: joined with boss_extrude3_tool
    add(part_3.part.fuse(boss_extrude3_tool.part, tol=0.00001))

    # Sketch8 → Cut-Extrude5 (cut)
    with BuildSketch(Plane.XY):
        with Locations((1.5, 4.25)):
            Circle(SKETCH8_R)
        with Locations((7, 4.25)):
            Circle(SKETCH8_R)
        with Locations((-2.859237177, -4.25)):
            Circle(SKETCH8_R)
        with Locations((16.5, 1.25)):
            Circle(SKETCH8_R_2)
    extrude(amount=CUT_EXTRUDE5_DEPTH, mode=Mode.SUBTRACT)

    # Sketch9 → Cut-Extrude6 (cut)
    with BuildSketch(Plane.XY.offset(7.5)):
        with Locations((16.5, 1.25)):
            Circle(SKETCH9_R)
        with Locations((7, 4.25)):
            Circle(SKETCH9_R_2)
        with Locations((1.5, 4.25)):
            Circle(SKETCH9_R_2)
        with Locations((-2.859237177, -4.25)):
            Circle(SKETCH9_R_2)
    extrude(amount=-CUT_EXTRUDE6_DEPTH, mode=Mode.SUBTRACT)

    # Fillet1
    # the kernel refuses this fillet: 2 mm, written as the material it takes off along each edge
    with BuildSketch(Plane(origin=(4.5, -5.5, 12.500000091), x_dir=(-0.999999999999992, -1.2701951171309344e-07, 0), z_dir=(0, 0, -1))) as fillet1_piece_1:
        with BuildLine():
            CenterArc((2.000000254, -2), FILLET1_R, 90.000006238, 89.999993762)
            Line((2.54e-07, -2), (0, 0))
            Line((0, 0), (2.000000036, 0))
        make_face()
    extrude(amount=9.500000091, mode=Mode.SUBTRACT)
    with BuildSketch(Plane(origin=(-17.5, 5.5, 3), x_dir=(-1, 0, 0), z_dir=(0, 0, 1))) as fillet1_piece_2:
        with BuildLine():
            CenterArc((5.690426959, 1.6651323), FILLET1_R, 155.570149399, 80.793103779)
            ThreePointArc((3.869490332, 2.492289964), (2.301329219, 0.676992328), (0, 0))
            Line((0, 0), (4.582575695, 0))
        make_face()
    extrude(amount=16.006646094, mode=Mode.SUBTRACT)


solid = part_4.part
